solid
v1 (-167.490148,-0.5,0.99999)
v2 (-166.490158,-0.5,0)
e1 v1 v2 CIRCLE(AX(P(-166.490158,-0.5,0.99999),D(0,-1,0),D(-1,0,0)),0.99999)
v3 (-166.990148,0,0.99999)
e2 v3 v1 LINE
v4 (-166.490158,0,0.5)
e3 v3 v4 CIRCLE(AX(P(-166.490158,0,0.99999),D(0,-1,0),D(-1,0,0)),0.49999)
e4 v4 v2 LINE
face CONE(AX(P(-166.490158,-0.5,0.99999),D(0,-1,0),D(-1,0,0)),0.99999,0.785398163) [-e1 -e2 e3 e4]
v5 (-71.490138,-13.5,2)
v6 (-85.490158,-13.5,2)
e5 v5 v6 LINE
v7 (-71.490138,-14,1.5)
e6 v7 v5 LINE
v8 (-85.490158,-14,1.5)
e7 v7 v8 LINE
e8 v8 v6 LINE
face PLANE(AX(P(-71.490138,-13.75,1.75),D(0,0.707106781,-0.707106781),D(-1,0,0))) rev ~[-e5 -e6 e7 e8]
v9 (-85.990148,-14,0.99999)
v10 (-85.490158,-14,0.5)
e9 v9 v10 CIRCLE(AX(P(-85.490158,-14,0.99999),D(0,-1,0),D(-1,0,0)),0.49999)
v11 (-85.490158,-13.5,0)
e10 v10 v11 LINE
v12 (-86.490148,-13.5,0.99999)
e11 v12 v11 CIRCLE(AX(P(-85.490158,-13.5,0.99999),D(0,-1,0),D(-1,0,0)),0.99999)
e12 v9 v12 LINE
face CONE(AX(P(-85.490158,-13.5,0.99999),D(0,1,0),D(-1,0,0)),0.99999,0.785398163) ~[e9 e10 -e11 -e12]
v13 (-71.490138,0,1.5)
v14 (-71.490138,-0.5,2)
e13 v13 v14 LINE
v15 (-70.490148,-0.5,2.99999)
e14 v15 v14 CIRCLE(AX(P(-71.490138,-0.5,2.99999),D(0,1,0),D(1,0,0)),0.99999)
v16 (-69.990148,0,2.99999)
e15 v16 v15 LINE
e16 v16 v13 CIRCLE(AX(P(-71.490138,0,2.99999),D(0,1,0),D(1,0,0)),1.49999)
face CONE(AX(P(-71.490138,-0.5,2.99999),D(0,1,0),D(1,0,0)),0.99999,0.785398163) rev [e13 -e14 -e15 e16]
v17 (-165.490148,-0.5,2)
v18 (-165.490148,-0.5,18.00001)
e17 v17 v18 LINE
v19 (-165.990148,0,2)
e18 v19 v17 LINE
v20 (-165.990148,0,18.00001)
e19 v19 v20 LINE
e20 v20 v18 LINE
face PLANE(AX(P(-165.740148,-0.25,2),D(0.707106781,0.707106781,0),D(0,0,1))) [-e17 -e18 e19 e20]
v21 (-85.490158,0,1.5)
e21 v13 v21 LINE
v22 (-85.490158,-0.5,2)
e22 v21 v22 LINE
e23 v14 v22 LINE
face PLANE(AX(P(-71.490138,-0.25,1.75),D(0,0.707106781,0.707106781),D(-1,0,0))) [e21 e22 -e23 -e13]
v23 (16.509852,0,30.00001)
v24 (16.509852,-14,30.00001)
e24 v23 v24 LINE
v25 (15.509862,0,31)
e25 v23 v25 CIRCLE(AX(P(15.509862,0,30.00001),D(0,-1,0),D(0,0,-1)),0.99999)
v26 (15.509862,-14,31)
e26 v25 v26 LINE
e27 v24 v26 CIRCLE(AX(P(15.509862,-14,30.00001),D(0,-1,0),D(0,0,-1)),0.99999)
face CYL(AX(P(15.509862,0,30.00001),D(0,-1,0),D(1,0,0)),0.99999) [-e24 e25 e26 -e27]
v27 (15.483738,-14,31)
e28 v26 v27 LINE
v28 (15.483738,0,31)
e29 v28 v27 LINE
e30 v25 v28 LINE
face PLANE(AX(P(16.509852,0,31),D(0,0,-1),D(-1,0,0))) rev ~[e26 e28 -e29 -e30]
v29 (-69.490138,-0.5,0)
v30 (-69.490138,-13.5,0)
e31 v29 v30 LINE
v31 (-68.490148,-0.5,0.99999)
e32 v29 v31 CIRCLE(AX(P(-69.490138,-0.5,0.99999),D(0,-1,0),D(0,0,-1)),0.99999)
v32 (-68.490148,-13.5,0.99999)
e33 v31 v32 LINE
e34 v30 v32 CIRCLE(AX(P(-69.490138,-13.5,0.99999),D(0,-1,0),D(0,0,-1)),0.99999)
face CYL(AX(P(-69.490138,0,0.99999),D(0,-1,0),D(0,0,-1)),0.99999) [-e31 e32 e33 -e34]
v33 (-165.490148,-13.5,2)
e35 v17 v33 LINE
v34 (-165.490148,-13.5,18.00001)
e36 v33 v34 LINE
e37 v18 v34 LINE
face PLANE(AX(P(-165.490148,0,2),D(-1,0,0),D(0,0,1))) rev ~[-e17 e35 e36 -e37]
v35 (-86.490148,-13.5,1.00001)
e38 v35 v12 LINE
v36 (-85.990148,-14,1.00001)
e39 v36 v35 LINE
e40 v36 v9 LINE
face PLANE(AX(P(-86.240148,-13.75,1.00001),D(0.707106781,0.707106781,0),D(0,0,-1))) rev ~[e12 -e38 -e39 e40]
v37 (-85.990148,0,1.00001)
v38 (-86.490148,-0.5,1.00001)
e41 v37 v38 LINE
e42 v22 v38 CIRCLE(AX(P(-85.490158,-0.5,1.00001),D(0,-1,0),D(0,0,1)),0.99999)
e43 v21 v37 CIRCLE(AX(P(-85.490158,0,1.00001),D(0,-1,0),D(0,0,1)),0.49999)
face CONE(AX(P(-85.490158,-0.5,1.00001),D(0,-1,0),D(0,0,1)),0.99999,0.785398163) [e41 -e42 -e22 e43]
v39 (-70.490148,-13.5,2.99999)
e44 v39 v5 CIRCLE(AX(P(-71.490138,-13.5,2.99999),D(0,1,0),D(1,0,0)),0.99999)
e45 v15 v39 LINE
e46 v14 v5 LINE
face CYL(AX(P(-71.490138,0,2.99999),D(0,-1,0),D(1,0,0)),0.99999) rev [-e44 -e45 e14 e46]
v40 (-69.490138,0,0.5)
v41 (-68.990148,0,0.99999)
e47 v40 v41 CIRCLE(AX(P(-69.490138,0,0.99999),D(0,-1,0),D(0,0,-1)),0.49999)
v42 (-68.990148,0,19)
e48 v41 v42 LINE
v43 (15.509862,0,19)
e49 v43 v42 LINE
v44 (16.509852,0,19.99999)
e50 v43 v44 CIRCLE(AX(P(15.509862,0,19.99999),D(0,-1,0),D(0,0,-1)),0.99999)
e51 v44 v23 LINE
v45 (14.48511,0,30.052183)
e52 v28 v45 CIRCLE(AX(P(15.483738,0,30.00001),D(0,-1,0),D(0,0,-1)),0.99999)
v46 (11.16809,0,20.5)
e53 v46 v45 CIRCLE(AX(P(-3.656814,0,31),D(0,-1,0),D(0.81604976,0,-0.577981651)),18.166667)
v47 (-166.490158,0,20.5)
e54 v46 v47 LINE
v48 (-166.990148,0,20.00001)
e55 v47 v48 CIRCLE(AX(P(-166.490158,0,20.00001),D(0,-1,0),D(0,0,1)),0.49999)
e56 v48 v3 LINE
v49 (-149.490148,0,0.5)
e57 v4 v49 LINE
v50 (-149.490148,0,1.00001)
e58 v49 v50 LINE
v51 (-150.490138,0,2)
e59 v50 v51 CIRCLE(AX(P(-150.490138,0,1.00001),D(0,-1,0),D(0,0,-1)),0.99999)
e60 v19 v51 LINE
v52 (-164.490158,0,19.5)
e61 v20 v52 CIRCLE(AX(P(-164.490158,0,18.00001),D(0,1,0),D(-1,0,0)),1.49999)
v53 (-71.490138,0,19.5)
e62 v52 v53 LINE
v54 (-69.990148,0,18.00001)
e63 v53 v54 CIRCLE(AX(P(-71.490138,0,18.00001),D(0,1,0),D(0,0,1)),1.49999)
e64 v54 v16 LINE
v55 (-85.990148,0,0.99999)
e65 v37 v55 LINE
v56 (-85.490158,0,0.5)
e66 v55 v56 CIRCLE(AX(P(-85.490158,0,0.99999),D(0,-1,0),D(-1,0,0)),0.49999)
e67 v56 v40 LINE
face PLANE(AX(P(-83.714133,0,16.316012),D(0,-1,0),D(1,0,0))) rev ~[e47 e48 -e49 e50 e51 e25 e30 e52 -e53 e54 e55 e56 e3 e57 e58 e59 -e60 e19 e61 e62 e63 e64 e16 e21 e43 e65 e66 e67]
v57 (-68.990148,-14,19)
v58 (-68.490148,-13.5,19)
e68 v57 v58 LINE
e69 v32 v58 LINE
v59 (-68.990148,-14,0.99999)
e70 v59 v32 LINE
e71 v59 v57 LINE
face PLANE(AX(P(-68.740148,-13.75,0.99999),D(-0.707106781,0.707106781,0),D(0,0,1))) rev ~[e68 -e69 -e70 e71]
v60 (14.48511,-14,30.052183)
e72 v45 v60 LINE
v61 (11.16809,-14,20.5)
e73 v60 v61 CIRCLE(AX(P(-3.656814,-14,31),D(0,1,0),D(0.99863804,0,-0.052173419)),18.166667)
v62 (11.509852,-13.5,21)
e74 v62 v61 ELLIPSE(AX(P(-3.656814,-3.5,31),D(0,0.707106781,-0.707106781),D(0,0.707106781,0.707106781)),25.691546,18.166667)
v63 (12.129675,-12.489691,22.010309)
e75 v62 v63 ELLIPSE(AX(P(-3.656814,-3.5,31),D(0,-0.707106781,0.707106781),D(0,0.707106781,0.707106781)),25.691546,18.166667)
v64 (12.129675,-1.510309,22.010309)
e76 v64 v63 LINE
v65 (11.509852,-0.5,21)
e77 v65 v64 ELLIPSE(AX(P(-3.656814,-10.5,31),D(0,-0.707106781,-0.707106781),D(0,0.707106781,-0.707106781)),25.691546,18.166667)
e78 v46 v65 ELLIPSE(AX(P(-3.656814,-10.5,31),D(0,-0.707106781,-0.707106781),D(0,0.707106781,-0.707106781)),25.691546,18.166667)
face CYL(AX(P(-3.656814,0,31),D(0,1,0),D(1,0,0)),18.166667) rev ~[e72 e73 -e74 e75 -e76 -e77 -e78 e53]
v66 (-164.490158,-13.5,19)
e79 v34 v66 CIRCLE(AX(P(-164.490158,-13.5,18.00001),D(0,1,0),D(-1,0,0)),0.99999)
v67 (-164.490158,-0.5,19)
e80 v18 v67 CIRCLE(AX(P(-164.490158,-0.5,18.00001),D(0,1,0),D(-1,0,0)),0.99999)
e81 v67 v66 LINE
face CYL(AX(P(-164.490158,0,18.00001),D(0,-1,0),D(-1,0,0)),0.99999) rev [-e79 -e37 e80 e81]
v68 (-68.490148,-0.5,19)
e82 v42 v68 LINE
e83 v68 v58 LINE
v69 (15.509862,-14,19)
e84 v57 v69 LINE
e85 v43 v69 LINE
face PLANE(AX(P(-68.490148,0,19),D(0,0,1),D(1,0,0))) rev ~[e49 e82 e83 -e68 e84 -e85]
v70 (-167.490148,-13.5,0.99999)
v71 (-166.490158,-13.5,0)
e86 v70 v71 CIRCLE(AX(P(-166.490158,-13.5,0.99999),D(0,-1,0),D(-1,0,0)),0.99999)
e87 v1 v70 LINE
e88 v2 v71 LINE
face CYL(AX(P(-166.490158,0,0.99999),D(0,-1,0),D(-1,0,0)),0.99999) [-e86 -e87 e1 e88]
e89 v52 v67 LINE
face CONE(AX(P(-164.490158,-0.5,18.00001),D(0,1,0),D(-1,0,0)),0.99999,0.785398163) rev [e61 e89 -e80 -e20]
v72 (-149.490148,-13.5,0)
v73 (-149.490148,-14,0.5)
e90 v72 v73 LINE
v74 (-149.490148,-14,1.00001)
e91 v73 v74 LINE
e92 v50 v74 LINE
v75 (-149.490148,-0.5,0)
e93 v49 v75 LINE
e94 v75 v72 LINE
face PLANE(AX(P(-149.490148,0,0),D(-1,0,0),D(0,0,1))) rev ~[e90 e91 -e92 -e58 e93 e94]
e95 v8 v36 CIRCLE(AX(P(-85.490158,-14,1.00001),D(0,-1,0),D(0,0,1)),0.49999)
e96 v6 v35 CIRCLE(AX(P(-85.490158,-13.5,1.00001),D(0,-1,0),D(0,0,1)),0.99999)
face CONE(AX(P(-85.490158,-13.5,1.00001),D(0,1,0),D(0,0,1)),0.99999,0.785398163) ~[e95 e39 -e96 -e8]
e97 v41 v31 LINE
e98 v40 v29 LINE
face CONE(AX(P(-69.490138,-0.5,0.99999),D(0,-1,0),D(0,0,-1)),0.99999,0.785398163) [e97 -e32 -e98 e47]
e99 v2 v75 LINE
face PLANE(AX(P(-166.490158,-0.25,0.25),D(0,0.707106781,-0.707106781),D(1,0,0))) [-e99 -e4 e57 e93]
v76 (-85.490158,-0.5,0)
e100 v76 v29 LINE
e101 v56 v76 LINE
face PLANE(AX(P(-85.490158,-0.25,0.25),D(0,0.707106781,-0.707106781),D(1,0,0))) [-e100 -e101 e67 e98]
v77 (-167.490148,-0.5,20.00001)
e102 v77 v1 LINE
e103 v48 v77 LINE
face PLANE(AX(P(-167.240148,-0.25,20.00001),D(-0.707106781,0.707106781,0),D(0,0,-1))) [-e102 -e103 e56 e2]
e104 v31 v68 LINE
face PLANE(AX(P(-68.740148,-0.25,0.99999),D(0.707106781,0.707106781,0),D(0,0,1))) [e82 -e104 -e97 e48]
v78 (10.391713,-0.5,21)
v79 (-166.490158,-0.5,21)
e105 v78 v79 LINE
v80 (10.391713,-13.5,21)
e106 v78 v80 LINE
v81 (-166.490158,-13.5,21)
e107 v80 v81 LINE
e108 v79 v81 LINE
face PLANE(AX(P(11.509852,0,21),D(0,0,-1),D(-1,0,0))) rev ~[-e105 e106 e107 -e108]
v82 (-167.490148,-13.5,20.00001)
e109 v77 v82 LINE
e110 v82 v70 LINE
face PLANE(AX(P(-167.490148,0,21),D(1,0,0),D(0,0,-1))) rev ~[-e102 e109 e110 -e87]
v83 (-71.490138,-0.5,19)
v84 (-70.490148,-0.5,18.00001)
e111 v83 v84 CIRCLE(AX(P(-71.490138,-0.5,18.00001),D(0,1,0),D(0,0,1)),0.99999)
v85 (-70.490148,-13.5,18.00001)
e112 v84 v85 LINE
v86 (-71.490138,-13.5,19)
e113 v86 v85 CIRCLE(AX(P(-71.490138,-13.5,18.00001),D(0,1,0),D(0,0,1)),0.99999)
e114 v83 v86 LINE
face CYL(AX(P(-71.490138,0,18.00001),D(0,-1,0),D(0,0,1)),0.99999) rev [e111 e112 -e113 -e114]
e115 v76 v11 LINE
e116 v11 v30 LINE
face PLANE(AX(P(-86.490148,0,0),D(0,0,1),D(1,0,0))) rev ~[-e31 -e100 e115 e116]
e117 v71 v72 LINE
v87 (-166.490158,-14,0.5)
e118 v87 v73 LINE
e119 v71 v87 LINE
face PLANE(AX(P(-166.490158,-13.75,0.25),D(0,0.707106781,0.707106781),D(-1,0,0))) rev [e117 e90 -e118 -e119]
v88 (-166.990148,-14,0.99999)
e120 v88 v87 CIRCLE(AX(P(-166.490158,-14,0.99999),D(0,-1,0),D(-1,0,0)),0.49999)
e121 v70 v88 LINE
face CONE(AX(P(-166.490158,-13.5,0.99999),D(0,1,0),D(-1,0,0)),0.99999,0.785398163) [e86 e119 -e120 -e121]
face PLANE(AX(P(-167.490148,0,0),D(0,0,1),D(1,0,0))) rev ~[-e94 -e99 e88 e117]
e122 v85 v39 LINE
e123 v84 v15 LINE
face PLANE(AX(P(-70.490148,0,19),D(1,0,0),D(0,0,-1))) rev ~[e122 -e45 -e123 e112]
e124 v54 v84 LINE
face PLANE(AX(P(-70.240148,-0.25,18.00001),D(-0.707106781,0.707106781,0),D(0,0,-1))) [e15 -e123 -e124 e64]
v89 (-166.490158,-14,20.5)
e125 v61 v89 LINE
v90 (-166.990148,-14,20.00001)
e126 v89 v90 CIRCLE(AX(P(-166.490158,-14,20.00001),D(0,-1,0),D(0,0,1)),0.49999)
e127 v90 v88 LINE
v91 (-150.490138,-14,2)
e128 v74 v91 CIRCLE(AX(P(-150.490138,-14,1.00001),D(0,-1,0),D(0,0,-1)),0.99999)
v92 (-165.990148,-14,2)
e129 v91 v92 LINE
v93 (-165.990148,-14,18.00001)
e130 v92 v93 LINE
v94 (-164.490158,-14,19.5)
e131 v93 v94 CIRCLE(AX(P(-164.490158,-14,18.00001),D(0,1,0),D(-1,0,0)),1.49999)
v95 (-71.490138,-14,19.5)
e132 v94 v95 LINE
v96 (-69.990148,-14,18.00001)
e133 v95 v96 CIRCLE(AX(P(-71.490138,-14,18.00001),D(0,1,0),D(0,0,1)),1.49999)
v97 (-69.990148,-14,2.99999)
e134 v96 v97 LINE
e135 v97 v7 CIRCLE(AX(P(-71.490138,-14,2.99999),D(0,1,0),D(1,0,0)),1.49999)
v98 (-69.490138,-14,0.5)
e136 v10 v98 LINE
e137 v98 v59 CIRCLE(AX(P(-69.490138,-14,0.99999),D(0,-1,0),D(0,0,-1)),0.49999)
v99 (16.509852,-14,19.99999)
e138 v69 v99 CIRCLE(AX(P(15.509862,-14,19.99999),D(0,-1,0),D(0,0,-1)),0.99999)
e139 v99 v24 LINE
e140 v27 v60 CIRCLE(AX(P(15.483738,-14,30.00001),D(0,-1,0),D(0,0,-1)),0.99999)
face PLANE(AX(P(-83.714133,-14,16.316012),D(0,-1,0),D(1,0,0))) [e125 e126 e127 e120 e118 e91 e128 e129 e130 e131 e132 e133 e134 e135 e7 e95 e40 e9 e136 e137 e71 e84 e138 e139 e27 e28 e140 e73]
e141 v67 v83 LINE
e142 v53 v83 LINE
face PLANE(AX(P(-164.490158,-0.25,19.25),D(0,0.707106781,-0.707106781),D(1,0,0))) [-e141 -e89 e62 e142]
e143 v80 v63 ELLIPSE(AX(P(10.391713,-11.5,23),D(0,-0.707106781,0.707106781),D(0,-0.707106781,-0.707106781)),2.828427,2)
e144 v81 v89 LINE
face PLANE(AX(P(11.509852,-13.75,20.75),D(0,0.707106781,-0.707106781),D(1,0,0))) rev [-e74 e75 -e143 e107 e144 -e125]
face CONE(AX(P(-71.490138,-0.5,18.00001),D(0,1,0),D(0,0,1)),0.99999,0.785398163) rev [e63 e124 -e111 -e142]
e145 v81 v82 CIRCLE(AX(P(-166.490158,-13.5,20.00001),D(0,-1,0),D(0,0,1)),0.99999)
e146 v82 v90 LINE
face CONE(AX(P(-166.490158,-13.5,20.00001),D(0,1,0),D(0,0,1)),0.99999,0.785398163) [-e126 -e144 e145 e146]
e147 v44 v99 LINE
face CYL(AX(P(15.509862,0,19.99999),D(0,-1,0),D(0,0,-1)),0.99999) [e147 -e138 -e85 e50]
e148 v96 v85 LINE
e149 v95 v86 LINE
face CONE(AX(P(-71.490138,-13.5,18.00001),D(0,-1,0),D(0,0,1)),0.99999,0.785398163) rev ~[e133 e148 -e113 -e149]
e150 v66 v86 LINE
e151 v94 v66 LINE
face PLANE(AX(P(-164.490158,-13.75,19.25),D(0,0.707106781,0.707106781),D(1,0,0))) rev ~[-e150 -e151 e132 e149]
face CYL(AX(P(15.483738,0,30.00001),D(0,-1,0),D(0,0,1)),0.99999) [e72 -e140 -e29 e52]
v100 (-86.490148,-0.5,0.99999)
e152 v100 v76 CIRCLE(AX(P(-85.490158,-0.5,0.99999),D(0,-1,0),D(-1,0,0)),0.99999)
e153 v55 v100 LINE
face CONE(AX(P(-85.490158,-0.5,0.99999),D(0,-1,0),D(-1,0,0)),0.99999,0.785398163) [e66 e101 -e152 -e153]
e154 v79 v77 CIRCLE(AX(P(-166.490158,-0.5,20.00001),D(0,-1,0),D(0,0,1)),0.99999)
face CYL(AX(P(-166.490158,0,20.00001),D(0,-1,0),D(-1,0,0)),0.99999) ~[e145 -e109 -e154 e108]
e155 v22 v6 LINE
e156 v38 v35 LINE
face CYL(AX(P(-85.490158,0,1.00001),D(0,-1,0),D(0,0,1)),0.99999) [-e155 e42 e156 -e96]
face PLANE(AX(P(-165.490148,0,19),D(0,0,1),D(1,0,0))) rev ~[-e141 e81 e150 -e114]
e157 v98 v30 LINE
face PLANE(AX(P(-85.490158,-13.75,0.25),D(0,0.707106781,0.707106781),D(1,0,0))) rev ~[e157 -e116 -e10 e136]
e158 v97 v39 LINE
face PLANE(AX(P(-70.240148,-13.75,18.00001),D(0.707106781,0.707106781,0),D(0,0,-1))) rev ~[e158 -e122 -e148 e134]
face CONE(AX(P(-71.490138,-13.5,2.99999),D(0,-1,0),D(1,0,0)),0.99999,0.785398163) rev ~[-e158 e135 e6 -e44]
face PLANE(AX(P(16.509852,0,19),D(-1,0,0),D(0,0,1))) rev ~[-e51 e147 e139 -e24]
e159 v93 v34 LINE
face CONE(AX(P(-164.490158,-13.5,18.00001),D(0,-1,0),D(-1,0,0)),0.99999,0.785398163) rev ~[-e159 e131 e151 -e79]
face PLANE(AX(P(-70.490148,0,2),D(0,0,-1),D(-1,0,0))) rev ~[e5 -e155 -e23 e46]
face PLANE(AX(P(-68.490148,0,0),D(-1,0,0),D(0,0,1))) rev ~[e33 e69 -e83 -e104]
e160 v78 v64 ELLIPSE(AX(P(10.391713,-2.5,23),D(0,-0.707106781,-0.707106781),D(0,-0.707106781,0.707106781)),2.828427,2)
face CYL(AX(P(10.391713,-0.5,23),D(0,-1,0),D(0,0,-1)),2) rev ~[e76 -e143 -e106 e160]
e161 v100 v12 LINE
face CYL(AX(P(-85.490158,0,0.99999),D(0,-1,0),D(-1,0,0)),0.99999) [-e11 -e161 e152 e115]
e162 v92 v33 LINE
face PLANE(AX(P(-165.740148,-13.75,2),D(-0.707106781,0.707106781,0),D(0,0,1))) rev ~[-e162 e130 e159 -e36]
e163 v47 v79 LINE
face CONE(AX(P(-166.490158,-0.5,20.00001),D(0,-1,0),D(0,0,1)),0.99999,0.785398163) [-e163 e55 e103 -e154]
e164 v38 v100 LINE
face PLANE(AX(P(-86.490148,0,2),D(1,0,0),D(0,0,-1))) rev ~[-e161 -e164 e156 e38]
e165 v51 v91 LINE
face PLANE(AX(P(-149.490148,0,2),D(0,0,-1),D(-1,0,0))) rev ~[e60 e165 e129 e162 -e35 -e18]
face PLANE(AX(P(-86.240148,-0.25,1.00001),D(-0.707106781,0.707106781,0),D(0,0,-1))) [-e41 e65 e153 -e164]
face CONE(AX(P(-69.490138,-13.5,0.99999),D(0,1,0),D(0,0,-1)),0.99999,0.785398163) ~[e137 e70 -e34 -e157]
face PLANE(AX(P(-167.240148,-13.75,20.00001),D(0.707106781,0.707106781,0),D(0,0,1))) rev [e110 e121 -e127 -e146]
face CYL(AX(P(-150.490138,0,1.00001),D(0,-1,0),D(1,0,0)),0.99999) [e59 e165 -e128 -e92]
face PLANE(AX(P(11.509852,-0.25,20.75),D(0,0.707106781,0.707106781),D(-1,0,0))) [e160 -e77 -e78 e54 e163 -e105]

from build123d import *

# Parameters (mm, degrees)
F1_DEPTH = 14
F2_R     = 0.99999
F3_SIZE  = 0.5
F4_R     = 2


# Not quite as in the source:
# - a fillet or chamfer is up to 0.001 mm smaller than in the source, because OpenCascade refuses the exact size


with BuildPart() as f1:
    # F0 (on Front) → F1 (new body)
    with BuildSketch(Plane.XZ):
        with BuildLine():
            Line((-68.4901475161, 21), (-167.4901475161, 21))
            Line((-167.4901475161, 21), (-167.4901475161, 0))
            Line((-167.4901475161, 0), (-149.4901475161, 0))
            Line((-149.4901475161, 0), (-149.4901475161, 2))
            Line((-149.4901475161, 2), (-165.4901475161, 2))
            Line((-165.4901475161, 2), (-165.4901475161, 19))
            Line((-165.4901475161, 19), (-70.4901475161, 19))
            Line((-70.4901475161, 19), (-70.4901475161, 2))
            Line((-70.4901475161, 2), (-86.4901475161, 2))
            Line((-86.4901475161, 2), (-86.4901475161, 0))
            Line((-86.4901475161, 0), (-68.4901475161, 0))
            Line((-68.4901475161, 0), (-68.4901475161, 19))
            Line((-68.4901475161, 19), (16.5098524839, 19))
            Line((16.5098524839, 19), (16.5098524839, 21))
            Line((16.5098524839, 21), (16.5098524839, 31))
            Line((16.5098524839, 31), (14.5098524839, 31))
            ThreePointArc((14.5098524839, 31), (13.7436966654, 25.7798467455), (11.5098524839, 21))
            Line((11.5098524839, 21), (-63.147776881, 21))
            Line((-63.147776881, 21), (-68.4901475161, 21))
        make_face()
    extrude(amount=F1_DEPTH)

    # F2 (radius 1 in the source; OpenCascade refuses exactly that, so slightly less here)
    f2_edges = [f1.edges().sort_by_distance(p)[0] for p in [
        (14.509852, -7, 31),
        (16.509852, -7, 31),
        (16.509852, -7, 19),
        (-70.490148, -7, 2),
        (-70.490148, -7, 19),
        (-86.490148, -7, 2),
        (-86.490148, -7, 0),
        (-68.490148, -7, 0),
        (-165.490148, -7, 19),
        (-149.490148, -7, 2),
        (-167.490148, -7, 0),
        (-167.490148, -7, 21),
    ]]
    fillet(f2_edges, radius=F2_R)

    # F3
    f3_edges = [f1.edges().sort_by_distance(p)[0] for p in [
        (-77.490153, 0, 21),
        (-117.990148, 0, 19),
        (-167.490148, -14, 10.5),
        (-68.490148, -14, 9.999995),
    ]]
    chamfer(f3_edges, length=F3_SIZE)

    # F4
    f4_edges = [f1.edges().sort_by_distance(p)[0] for p in [
        (11.509852, -7, 21),
    ]]
    fillet(f4_edges, radius=F4_R)


solid = f1.part
